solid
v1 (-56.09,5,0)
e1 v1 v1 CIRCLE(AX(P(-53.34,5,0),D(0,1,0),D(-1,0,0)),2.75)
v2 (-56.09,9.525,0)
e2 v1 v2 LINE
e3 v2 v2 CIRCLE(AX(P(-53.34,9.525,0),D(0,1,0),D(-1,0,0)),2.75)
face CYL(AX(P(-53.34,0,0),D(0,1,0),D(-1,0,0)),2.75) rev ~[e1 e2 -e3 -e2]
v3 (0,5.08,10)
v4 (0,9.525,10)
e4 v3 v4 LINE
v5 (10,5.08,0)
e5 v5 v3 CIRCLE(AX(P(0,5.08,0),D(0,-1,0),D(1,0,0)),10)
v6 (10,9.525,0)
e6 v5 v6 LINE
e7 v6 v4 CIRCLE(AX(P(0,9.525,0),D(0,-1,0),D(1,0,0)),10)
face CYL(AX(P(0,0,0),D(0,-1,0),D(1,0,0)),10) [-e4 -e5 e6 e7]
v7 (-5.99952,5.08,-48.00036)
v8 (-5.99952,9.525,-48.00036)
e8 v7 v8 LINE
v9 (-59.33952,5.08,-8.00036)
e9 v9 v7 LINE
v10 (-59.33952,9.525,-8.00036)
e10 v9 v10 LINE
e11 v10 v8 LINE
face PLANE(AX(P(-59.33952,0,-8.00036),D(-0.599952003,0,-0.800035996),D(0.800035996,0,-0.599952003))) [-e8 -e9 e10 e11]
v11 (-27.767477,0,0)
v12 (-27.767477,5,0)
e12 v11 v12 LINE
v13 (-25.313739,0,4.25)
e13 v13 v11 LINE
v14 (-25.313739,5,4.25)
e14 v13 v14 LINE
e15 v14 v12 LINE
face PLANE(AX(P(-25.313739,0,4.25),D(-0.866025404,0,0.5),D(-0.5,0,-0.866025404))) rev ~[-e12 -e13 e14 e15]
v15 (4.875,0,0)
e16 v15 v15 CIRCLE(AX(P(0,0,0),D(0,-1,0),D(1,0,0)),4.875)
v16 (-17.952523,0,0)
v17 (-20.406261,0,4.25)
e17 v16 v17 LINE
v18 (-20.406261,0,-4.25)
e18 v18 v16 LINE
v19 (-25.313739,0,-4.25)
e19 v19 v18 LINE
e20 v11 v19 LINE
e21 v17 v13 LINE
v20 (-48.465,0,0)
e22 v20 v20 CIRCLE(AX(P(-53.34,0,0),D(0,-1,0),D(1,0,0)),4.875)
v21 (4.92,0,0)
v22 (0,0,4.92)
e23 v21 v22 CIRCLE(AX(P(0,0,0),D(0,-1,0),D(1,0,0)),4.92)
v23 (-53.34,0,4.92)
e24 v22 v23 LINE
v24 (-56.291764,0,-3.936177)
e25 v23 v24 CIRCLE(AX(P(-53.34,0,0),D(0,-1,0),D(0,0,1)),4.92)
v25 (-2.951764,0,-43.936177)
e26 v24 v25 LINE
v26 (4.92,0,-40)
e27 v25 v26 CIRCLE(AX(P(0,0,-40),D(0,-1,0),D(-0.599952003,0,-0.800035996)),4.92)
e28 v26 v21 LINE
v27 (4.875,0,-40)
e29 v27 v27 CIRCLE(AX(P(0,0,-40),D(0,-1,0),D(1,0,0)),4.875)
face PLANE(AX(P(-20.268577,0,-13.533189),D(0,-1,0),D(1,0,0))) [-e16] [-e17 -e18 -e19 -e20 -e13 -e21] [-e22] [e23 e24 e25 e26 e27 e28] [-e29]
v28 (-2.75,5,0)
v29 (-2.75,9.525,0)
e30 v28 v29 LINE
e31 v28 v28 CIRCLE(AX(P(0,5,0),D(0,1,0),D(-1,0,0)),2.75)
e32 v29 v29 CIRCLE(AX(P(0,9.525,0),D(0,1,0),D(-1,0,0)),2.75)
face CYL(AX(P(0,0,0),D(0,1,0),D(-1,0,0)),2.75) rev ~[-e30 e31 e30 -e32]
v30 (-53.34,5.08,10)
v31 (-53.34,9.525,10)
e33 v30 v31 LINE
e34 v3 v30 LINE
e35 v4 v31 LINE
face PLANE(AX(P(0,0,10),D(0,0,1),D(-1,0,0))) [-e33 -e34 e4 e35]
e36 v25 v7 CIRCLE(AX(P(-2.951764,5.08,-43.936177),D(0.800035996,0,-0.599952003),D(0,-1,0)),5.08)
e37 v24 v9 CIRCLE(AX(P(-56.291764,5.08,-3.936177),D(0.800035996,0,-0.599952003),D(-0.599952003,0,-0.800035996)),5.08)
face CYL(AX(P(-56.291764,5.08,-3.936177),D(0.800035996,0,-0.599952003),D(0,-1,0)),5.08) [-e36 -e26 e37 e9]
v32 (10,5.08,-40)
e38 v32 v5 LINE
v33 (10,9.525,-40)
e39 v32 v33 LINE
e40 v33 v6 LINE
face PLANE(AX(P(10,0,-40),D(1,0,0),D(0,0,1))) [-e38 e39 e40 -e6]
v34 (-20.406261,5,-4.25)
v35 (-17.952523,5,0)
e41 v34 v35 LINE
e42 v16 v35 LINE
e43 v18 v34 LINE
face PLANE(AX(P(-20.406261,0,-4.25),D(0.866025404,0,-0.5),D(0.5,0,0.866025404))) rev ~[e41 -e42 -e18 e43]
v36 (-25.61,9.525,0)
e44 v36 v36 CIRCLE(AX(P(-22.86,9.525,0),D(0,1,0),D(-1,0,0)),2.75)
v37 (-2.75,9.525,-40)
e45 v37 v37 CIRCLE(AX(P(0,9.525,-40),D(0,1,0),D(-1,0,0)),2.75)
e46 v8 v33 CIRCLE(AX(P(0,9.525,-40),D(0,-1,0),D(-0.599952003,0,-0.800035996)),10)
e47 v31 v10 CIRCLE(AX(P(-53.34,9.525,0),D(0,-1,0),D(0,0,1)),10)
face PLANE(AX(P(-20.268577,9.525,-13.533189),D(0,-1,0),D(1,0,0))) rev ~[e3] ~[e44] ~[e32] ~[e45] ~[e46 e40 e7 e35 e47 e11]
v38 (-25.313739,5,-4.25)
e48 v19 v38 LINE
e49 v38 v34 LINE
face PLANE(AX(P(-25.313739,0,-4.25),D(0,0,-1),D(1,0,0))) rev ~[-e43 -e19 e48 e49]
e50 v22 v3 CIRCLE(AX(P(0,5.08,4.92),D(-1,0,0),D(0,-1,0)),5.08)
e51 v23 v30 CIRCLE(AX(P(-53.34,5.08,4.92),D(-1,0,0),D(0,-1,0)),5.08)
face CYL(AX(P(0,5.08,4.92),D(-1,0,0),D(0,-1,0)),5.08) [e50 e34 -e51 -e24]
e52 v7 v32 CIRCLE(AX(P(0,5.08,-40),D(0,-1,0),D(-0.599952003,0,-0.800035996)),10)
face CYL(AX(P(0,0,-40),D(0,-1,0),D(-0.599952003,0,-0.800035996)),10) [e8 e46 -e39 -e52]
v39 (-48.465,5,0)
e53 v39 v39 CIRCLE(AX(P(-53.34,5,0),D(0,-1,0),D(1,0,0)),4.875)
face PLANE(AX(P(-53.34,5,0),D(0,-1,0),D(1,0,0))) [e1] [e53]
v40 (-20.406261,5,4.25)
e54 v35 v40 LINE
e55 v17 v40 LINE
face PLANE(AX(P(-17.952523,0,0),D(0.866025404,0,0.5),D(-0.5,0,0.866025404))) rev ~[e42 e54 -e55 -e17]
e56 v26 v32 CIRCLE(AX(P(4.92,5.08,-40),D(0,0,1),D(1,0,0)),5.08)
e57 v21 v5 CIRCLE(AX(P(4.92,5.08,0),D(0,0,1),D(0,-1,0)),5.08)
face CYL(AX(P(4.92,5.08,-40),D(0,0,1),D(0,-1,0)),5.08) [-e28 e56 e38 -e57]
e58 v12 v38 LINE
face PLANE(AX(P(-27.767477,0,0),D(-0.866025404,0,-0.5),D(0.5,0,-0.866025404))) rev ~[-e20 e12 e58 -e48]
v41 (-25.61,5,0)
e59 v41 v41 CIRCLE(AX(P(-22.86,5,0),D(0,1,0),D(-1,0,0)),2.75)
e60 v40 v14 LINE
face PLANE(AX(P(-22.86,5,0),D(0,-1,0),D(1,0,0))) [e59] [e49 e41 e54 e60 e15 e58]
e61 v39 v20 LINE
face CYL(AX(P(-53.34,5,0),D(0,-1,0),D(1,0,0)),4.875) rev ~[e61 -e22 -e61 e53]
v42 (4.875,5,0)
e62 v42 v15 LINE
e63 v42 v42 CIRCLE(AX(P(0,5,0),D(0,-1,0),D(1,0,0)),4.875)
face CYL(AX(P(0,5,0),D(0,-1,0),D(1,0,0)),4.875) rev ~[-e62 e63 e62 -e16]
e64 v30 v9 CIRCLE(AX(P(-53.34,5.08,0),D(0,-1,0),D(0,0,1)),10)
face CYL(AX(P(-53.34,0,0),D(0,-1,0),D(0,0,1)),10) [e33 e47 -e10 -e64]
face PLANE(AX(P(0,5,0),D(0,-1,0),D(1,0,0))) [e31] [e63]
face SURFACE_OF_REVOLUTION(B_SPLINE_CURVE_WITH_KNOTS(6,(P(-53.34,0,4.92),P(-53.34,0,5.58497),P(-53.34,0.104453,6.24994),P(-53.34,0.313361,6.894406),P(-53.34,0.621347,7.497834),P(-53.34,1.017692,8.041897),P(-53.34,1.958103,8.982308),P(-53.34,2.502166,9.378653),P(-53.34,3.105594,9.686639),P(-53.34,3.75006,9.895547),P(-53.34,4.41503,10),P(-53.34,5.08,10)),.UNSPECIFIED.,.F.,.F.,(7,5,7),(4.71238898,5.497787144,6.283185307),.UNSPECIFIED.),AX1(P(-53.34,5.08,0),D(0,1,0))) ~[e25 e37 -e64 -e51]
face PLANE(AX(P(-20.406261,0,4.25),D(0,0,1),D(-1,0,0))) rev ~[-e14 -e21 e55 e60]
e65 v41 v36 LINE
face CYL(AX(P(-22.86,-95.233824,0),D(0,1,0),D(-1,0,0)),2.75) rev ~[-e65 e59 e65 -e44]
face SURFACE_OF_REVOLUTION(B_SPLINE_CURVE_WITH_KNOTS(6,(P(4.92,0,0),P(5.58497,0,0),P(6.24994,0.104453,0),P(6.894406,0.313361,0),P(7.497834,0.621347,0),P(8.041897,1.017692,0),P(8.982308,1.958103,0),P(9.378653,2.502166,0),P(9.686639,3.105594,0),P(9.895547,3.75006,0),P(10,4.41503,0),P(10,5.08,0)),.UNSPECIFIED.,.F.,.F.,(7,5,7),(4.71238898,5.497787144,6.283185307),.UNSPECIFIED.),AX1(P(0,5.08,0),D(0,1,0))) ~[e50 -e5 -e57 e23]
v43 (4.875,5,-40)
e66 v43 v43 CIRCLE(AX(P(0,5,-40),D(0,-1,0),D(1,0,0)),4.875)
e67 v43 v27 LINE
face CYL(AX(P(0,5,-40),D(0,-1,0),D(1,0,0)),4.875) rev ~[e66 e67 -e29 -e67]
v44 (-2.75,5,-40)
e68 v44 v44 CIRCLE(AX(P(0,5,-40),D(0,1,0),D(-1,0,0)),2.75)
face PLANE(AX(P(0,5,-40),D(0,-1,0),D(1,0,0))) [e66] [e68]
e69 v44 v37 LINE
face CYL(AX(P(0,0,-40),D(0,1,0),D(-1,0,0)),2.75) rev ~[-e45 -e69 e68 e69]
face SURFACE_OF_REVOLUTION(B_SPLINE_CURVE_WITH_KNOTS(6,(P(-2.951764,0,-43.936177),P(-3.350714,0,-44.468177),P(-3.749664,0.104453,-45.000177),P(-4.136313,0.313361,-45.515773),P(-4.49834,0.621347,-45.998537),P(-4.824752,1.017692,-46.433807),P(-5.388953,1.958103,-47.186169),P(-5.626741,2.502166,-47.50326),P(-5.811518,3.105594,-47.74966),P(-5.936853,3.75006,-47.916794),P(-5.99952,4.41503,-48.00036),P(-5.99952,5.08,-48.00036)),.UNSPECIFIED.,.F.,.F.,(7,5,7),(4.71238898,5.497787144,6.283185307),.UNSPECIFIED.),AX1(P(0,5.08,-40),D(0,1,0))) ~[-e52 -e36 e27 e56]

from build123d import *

# Parameters (mm, degrees)
F1_DEPTH       = 9.525
F2_D           = 5.5
F2_CBORE_D     = 9.75
F2_CBORE_DEPTH = 5
F3_R           = 5.08
F4_DEPTH       = 5
F5_D           = 5.5


# Not quite as in the source:
# - a feature names something its author has since deleted; it is built from what else it names


with BuildPart() as f1:
    # F0 (on Front) → F1 (new body)
    with BuildSketch(Plane.XZ):
        with BuildLine():
            Line((10, -40), (10, 0))
            ThreePointArc((10, 0), (7.0710678119, 7.0710678119), (0, 10))
            Line((0, 10), (-53.34, 10))
            ThreePointArc((-53.34, 10), (-62.826927837, 3.1619930765), (-59.3395200276, -8.0003599568))
            Line((-59.3395200276, -8.0003599568), (-5.9995200276, -48.0003599568))
            ThreePointArc((-5.9995200276, -48.0003599568), (4.4724042597, -48.9441377526), (10, -40))
        make_face()
        Polygon((-17.9525227119, 0), (-20.4062613559, -4.25), (-25.3137386441, -4.25), (-27.7674772881, 0), (-25.3137386441, 4.25), (-20.4062613559, 4.25), align=None, mode=Mode.SUBTRACT)
        Polygon((-25.3137386441, -4.25), (-20.4062613559, -4.25), (-17.9525227119, 0), (-20.4062613559, 4.25), (-25.3137386441, 4.25), (-27.7674772881, 0), align=None)
    extrude(amount=-F1_DEPTH)

    # F2 (through all)
    with Locations(Plane.XZ):
        with Locations((0, 0), (0, -40), (-53.34, 0)):
            CounterBoreHole(F2_D / 2, F2_CBORE_D / 2, F2_CBORE_DEPTH)

    # F3
    f3_edges = [f1.edges().sort_by_distance(p)[0] for p in [
        (-26.67, 0, 10),
    ]]
    fillet(f3_edges, radius=F3_R)

    # F0 (on Front) → F4 (cut)
    with BuildSketch(Plane.XZ):
        Polygon((-25.3137386441, -4.25), (-20.4062613559, -4.25), (-17.9525227119, 0), (-20.4062613559, 4.25), (-25.3137386441, 4.25), (-27.7674772881, 0), align=None)
    extrude(amount=-F4_DEPTH, mode=Mode.SUBTRACT)

    # F5 (through all)
    with Locations(Plane.XZ):
        with Locations((-22.86, 0)):
            Hole(F5_D / 2)


solid = f1.part
